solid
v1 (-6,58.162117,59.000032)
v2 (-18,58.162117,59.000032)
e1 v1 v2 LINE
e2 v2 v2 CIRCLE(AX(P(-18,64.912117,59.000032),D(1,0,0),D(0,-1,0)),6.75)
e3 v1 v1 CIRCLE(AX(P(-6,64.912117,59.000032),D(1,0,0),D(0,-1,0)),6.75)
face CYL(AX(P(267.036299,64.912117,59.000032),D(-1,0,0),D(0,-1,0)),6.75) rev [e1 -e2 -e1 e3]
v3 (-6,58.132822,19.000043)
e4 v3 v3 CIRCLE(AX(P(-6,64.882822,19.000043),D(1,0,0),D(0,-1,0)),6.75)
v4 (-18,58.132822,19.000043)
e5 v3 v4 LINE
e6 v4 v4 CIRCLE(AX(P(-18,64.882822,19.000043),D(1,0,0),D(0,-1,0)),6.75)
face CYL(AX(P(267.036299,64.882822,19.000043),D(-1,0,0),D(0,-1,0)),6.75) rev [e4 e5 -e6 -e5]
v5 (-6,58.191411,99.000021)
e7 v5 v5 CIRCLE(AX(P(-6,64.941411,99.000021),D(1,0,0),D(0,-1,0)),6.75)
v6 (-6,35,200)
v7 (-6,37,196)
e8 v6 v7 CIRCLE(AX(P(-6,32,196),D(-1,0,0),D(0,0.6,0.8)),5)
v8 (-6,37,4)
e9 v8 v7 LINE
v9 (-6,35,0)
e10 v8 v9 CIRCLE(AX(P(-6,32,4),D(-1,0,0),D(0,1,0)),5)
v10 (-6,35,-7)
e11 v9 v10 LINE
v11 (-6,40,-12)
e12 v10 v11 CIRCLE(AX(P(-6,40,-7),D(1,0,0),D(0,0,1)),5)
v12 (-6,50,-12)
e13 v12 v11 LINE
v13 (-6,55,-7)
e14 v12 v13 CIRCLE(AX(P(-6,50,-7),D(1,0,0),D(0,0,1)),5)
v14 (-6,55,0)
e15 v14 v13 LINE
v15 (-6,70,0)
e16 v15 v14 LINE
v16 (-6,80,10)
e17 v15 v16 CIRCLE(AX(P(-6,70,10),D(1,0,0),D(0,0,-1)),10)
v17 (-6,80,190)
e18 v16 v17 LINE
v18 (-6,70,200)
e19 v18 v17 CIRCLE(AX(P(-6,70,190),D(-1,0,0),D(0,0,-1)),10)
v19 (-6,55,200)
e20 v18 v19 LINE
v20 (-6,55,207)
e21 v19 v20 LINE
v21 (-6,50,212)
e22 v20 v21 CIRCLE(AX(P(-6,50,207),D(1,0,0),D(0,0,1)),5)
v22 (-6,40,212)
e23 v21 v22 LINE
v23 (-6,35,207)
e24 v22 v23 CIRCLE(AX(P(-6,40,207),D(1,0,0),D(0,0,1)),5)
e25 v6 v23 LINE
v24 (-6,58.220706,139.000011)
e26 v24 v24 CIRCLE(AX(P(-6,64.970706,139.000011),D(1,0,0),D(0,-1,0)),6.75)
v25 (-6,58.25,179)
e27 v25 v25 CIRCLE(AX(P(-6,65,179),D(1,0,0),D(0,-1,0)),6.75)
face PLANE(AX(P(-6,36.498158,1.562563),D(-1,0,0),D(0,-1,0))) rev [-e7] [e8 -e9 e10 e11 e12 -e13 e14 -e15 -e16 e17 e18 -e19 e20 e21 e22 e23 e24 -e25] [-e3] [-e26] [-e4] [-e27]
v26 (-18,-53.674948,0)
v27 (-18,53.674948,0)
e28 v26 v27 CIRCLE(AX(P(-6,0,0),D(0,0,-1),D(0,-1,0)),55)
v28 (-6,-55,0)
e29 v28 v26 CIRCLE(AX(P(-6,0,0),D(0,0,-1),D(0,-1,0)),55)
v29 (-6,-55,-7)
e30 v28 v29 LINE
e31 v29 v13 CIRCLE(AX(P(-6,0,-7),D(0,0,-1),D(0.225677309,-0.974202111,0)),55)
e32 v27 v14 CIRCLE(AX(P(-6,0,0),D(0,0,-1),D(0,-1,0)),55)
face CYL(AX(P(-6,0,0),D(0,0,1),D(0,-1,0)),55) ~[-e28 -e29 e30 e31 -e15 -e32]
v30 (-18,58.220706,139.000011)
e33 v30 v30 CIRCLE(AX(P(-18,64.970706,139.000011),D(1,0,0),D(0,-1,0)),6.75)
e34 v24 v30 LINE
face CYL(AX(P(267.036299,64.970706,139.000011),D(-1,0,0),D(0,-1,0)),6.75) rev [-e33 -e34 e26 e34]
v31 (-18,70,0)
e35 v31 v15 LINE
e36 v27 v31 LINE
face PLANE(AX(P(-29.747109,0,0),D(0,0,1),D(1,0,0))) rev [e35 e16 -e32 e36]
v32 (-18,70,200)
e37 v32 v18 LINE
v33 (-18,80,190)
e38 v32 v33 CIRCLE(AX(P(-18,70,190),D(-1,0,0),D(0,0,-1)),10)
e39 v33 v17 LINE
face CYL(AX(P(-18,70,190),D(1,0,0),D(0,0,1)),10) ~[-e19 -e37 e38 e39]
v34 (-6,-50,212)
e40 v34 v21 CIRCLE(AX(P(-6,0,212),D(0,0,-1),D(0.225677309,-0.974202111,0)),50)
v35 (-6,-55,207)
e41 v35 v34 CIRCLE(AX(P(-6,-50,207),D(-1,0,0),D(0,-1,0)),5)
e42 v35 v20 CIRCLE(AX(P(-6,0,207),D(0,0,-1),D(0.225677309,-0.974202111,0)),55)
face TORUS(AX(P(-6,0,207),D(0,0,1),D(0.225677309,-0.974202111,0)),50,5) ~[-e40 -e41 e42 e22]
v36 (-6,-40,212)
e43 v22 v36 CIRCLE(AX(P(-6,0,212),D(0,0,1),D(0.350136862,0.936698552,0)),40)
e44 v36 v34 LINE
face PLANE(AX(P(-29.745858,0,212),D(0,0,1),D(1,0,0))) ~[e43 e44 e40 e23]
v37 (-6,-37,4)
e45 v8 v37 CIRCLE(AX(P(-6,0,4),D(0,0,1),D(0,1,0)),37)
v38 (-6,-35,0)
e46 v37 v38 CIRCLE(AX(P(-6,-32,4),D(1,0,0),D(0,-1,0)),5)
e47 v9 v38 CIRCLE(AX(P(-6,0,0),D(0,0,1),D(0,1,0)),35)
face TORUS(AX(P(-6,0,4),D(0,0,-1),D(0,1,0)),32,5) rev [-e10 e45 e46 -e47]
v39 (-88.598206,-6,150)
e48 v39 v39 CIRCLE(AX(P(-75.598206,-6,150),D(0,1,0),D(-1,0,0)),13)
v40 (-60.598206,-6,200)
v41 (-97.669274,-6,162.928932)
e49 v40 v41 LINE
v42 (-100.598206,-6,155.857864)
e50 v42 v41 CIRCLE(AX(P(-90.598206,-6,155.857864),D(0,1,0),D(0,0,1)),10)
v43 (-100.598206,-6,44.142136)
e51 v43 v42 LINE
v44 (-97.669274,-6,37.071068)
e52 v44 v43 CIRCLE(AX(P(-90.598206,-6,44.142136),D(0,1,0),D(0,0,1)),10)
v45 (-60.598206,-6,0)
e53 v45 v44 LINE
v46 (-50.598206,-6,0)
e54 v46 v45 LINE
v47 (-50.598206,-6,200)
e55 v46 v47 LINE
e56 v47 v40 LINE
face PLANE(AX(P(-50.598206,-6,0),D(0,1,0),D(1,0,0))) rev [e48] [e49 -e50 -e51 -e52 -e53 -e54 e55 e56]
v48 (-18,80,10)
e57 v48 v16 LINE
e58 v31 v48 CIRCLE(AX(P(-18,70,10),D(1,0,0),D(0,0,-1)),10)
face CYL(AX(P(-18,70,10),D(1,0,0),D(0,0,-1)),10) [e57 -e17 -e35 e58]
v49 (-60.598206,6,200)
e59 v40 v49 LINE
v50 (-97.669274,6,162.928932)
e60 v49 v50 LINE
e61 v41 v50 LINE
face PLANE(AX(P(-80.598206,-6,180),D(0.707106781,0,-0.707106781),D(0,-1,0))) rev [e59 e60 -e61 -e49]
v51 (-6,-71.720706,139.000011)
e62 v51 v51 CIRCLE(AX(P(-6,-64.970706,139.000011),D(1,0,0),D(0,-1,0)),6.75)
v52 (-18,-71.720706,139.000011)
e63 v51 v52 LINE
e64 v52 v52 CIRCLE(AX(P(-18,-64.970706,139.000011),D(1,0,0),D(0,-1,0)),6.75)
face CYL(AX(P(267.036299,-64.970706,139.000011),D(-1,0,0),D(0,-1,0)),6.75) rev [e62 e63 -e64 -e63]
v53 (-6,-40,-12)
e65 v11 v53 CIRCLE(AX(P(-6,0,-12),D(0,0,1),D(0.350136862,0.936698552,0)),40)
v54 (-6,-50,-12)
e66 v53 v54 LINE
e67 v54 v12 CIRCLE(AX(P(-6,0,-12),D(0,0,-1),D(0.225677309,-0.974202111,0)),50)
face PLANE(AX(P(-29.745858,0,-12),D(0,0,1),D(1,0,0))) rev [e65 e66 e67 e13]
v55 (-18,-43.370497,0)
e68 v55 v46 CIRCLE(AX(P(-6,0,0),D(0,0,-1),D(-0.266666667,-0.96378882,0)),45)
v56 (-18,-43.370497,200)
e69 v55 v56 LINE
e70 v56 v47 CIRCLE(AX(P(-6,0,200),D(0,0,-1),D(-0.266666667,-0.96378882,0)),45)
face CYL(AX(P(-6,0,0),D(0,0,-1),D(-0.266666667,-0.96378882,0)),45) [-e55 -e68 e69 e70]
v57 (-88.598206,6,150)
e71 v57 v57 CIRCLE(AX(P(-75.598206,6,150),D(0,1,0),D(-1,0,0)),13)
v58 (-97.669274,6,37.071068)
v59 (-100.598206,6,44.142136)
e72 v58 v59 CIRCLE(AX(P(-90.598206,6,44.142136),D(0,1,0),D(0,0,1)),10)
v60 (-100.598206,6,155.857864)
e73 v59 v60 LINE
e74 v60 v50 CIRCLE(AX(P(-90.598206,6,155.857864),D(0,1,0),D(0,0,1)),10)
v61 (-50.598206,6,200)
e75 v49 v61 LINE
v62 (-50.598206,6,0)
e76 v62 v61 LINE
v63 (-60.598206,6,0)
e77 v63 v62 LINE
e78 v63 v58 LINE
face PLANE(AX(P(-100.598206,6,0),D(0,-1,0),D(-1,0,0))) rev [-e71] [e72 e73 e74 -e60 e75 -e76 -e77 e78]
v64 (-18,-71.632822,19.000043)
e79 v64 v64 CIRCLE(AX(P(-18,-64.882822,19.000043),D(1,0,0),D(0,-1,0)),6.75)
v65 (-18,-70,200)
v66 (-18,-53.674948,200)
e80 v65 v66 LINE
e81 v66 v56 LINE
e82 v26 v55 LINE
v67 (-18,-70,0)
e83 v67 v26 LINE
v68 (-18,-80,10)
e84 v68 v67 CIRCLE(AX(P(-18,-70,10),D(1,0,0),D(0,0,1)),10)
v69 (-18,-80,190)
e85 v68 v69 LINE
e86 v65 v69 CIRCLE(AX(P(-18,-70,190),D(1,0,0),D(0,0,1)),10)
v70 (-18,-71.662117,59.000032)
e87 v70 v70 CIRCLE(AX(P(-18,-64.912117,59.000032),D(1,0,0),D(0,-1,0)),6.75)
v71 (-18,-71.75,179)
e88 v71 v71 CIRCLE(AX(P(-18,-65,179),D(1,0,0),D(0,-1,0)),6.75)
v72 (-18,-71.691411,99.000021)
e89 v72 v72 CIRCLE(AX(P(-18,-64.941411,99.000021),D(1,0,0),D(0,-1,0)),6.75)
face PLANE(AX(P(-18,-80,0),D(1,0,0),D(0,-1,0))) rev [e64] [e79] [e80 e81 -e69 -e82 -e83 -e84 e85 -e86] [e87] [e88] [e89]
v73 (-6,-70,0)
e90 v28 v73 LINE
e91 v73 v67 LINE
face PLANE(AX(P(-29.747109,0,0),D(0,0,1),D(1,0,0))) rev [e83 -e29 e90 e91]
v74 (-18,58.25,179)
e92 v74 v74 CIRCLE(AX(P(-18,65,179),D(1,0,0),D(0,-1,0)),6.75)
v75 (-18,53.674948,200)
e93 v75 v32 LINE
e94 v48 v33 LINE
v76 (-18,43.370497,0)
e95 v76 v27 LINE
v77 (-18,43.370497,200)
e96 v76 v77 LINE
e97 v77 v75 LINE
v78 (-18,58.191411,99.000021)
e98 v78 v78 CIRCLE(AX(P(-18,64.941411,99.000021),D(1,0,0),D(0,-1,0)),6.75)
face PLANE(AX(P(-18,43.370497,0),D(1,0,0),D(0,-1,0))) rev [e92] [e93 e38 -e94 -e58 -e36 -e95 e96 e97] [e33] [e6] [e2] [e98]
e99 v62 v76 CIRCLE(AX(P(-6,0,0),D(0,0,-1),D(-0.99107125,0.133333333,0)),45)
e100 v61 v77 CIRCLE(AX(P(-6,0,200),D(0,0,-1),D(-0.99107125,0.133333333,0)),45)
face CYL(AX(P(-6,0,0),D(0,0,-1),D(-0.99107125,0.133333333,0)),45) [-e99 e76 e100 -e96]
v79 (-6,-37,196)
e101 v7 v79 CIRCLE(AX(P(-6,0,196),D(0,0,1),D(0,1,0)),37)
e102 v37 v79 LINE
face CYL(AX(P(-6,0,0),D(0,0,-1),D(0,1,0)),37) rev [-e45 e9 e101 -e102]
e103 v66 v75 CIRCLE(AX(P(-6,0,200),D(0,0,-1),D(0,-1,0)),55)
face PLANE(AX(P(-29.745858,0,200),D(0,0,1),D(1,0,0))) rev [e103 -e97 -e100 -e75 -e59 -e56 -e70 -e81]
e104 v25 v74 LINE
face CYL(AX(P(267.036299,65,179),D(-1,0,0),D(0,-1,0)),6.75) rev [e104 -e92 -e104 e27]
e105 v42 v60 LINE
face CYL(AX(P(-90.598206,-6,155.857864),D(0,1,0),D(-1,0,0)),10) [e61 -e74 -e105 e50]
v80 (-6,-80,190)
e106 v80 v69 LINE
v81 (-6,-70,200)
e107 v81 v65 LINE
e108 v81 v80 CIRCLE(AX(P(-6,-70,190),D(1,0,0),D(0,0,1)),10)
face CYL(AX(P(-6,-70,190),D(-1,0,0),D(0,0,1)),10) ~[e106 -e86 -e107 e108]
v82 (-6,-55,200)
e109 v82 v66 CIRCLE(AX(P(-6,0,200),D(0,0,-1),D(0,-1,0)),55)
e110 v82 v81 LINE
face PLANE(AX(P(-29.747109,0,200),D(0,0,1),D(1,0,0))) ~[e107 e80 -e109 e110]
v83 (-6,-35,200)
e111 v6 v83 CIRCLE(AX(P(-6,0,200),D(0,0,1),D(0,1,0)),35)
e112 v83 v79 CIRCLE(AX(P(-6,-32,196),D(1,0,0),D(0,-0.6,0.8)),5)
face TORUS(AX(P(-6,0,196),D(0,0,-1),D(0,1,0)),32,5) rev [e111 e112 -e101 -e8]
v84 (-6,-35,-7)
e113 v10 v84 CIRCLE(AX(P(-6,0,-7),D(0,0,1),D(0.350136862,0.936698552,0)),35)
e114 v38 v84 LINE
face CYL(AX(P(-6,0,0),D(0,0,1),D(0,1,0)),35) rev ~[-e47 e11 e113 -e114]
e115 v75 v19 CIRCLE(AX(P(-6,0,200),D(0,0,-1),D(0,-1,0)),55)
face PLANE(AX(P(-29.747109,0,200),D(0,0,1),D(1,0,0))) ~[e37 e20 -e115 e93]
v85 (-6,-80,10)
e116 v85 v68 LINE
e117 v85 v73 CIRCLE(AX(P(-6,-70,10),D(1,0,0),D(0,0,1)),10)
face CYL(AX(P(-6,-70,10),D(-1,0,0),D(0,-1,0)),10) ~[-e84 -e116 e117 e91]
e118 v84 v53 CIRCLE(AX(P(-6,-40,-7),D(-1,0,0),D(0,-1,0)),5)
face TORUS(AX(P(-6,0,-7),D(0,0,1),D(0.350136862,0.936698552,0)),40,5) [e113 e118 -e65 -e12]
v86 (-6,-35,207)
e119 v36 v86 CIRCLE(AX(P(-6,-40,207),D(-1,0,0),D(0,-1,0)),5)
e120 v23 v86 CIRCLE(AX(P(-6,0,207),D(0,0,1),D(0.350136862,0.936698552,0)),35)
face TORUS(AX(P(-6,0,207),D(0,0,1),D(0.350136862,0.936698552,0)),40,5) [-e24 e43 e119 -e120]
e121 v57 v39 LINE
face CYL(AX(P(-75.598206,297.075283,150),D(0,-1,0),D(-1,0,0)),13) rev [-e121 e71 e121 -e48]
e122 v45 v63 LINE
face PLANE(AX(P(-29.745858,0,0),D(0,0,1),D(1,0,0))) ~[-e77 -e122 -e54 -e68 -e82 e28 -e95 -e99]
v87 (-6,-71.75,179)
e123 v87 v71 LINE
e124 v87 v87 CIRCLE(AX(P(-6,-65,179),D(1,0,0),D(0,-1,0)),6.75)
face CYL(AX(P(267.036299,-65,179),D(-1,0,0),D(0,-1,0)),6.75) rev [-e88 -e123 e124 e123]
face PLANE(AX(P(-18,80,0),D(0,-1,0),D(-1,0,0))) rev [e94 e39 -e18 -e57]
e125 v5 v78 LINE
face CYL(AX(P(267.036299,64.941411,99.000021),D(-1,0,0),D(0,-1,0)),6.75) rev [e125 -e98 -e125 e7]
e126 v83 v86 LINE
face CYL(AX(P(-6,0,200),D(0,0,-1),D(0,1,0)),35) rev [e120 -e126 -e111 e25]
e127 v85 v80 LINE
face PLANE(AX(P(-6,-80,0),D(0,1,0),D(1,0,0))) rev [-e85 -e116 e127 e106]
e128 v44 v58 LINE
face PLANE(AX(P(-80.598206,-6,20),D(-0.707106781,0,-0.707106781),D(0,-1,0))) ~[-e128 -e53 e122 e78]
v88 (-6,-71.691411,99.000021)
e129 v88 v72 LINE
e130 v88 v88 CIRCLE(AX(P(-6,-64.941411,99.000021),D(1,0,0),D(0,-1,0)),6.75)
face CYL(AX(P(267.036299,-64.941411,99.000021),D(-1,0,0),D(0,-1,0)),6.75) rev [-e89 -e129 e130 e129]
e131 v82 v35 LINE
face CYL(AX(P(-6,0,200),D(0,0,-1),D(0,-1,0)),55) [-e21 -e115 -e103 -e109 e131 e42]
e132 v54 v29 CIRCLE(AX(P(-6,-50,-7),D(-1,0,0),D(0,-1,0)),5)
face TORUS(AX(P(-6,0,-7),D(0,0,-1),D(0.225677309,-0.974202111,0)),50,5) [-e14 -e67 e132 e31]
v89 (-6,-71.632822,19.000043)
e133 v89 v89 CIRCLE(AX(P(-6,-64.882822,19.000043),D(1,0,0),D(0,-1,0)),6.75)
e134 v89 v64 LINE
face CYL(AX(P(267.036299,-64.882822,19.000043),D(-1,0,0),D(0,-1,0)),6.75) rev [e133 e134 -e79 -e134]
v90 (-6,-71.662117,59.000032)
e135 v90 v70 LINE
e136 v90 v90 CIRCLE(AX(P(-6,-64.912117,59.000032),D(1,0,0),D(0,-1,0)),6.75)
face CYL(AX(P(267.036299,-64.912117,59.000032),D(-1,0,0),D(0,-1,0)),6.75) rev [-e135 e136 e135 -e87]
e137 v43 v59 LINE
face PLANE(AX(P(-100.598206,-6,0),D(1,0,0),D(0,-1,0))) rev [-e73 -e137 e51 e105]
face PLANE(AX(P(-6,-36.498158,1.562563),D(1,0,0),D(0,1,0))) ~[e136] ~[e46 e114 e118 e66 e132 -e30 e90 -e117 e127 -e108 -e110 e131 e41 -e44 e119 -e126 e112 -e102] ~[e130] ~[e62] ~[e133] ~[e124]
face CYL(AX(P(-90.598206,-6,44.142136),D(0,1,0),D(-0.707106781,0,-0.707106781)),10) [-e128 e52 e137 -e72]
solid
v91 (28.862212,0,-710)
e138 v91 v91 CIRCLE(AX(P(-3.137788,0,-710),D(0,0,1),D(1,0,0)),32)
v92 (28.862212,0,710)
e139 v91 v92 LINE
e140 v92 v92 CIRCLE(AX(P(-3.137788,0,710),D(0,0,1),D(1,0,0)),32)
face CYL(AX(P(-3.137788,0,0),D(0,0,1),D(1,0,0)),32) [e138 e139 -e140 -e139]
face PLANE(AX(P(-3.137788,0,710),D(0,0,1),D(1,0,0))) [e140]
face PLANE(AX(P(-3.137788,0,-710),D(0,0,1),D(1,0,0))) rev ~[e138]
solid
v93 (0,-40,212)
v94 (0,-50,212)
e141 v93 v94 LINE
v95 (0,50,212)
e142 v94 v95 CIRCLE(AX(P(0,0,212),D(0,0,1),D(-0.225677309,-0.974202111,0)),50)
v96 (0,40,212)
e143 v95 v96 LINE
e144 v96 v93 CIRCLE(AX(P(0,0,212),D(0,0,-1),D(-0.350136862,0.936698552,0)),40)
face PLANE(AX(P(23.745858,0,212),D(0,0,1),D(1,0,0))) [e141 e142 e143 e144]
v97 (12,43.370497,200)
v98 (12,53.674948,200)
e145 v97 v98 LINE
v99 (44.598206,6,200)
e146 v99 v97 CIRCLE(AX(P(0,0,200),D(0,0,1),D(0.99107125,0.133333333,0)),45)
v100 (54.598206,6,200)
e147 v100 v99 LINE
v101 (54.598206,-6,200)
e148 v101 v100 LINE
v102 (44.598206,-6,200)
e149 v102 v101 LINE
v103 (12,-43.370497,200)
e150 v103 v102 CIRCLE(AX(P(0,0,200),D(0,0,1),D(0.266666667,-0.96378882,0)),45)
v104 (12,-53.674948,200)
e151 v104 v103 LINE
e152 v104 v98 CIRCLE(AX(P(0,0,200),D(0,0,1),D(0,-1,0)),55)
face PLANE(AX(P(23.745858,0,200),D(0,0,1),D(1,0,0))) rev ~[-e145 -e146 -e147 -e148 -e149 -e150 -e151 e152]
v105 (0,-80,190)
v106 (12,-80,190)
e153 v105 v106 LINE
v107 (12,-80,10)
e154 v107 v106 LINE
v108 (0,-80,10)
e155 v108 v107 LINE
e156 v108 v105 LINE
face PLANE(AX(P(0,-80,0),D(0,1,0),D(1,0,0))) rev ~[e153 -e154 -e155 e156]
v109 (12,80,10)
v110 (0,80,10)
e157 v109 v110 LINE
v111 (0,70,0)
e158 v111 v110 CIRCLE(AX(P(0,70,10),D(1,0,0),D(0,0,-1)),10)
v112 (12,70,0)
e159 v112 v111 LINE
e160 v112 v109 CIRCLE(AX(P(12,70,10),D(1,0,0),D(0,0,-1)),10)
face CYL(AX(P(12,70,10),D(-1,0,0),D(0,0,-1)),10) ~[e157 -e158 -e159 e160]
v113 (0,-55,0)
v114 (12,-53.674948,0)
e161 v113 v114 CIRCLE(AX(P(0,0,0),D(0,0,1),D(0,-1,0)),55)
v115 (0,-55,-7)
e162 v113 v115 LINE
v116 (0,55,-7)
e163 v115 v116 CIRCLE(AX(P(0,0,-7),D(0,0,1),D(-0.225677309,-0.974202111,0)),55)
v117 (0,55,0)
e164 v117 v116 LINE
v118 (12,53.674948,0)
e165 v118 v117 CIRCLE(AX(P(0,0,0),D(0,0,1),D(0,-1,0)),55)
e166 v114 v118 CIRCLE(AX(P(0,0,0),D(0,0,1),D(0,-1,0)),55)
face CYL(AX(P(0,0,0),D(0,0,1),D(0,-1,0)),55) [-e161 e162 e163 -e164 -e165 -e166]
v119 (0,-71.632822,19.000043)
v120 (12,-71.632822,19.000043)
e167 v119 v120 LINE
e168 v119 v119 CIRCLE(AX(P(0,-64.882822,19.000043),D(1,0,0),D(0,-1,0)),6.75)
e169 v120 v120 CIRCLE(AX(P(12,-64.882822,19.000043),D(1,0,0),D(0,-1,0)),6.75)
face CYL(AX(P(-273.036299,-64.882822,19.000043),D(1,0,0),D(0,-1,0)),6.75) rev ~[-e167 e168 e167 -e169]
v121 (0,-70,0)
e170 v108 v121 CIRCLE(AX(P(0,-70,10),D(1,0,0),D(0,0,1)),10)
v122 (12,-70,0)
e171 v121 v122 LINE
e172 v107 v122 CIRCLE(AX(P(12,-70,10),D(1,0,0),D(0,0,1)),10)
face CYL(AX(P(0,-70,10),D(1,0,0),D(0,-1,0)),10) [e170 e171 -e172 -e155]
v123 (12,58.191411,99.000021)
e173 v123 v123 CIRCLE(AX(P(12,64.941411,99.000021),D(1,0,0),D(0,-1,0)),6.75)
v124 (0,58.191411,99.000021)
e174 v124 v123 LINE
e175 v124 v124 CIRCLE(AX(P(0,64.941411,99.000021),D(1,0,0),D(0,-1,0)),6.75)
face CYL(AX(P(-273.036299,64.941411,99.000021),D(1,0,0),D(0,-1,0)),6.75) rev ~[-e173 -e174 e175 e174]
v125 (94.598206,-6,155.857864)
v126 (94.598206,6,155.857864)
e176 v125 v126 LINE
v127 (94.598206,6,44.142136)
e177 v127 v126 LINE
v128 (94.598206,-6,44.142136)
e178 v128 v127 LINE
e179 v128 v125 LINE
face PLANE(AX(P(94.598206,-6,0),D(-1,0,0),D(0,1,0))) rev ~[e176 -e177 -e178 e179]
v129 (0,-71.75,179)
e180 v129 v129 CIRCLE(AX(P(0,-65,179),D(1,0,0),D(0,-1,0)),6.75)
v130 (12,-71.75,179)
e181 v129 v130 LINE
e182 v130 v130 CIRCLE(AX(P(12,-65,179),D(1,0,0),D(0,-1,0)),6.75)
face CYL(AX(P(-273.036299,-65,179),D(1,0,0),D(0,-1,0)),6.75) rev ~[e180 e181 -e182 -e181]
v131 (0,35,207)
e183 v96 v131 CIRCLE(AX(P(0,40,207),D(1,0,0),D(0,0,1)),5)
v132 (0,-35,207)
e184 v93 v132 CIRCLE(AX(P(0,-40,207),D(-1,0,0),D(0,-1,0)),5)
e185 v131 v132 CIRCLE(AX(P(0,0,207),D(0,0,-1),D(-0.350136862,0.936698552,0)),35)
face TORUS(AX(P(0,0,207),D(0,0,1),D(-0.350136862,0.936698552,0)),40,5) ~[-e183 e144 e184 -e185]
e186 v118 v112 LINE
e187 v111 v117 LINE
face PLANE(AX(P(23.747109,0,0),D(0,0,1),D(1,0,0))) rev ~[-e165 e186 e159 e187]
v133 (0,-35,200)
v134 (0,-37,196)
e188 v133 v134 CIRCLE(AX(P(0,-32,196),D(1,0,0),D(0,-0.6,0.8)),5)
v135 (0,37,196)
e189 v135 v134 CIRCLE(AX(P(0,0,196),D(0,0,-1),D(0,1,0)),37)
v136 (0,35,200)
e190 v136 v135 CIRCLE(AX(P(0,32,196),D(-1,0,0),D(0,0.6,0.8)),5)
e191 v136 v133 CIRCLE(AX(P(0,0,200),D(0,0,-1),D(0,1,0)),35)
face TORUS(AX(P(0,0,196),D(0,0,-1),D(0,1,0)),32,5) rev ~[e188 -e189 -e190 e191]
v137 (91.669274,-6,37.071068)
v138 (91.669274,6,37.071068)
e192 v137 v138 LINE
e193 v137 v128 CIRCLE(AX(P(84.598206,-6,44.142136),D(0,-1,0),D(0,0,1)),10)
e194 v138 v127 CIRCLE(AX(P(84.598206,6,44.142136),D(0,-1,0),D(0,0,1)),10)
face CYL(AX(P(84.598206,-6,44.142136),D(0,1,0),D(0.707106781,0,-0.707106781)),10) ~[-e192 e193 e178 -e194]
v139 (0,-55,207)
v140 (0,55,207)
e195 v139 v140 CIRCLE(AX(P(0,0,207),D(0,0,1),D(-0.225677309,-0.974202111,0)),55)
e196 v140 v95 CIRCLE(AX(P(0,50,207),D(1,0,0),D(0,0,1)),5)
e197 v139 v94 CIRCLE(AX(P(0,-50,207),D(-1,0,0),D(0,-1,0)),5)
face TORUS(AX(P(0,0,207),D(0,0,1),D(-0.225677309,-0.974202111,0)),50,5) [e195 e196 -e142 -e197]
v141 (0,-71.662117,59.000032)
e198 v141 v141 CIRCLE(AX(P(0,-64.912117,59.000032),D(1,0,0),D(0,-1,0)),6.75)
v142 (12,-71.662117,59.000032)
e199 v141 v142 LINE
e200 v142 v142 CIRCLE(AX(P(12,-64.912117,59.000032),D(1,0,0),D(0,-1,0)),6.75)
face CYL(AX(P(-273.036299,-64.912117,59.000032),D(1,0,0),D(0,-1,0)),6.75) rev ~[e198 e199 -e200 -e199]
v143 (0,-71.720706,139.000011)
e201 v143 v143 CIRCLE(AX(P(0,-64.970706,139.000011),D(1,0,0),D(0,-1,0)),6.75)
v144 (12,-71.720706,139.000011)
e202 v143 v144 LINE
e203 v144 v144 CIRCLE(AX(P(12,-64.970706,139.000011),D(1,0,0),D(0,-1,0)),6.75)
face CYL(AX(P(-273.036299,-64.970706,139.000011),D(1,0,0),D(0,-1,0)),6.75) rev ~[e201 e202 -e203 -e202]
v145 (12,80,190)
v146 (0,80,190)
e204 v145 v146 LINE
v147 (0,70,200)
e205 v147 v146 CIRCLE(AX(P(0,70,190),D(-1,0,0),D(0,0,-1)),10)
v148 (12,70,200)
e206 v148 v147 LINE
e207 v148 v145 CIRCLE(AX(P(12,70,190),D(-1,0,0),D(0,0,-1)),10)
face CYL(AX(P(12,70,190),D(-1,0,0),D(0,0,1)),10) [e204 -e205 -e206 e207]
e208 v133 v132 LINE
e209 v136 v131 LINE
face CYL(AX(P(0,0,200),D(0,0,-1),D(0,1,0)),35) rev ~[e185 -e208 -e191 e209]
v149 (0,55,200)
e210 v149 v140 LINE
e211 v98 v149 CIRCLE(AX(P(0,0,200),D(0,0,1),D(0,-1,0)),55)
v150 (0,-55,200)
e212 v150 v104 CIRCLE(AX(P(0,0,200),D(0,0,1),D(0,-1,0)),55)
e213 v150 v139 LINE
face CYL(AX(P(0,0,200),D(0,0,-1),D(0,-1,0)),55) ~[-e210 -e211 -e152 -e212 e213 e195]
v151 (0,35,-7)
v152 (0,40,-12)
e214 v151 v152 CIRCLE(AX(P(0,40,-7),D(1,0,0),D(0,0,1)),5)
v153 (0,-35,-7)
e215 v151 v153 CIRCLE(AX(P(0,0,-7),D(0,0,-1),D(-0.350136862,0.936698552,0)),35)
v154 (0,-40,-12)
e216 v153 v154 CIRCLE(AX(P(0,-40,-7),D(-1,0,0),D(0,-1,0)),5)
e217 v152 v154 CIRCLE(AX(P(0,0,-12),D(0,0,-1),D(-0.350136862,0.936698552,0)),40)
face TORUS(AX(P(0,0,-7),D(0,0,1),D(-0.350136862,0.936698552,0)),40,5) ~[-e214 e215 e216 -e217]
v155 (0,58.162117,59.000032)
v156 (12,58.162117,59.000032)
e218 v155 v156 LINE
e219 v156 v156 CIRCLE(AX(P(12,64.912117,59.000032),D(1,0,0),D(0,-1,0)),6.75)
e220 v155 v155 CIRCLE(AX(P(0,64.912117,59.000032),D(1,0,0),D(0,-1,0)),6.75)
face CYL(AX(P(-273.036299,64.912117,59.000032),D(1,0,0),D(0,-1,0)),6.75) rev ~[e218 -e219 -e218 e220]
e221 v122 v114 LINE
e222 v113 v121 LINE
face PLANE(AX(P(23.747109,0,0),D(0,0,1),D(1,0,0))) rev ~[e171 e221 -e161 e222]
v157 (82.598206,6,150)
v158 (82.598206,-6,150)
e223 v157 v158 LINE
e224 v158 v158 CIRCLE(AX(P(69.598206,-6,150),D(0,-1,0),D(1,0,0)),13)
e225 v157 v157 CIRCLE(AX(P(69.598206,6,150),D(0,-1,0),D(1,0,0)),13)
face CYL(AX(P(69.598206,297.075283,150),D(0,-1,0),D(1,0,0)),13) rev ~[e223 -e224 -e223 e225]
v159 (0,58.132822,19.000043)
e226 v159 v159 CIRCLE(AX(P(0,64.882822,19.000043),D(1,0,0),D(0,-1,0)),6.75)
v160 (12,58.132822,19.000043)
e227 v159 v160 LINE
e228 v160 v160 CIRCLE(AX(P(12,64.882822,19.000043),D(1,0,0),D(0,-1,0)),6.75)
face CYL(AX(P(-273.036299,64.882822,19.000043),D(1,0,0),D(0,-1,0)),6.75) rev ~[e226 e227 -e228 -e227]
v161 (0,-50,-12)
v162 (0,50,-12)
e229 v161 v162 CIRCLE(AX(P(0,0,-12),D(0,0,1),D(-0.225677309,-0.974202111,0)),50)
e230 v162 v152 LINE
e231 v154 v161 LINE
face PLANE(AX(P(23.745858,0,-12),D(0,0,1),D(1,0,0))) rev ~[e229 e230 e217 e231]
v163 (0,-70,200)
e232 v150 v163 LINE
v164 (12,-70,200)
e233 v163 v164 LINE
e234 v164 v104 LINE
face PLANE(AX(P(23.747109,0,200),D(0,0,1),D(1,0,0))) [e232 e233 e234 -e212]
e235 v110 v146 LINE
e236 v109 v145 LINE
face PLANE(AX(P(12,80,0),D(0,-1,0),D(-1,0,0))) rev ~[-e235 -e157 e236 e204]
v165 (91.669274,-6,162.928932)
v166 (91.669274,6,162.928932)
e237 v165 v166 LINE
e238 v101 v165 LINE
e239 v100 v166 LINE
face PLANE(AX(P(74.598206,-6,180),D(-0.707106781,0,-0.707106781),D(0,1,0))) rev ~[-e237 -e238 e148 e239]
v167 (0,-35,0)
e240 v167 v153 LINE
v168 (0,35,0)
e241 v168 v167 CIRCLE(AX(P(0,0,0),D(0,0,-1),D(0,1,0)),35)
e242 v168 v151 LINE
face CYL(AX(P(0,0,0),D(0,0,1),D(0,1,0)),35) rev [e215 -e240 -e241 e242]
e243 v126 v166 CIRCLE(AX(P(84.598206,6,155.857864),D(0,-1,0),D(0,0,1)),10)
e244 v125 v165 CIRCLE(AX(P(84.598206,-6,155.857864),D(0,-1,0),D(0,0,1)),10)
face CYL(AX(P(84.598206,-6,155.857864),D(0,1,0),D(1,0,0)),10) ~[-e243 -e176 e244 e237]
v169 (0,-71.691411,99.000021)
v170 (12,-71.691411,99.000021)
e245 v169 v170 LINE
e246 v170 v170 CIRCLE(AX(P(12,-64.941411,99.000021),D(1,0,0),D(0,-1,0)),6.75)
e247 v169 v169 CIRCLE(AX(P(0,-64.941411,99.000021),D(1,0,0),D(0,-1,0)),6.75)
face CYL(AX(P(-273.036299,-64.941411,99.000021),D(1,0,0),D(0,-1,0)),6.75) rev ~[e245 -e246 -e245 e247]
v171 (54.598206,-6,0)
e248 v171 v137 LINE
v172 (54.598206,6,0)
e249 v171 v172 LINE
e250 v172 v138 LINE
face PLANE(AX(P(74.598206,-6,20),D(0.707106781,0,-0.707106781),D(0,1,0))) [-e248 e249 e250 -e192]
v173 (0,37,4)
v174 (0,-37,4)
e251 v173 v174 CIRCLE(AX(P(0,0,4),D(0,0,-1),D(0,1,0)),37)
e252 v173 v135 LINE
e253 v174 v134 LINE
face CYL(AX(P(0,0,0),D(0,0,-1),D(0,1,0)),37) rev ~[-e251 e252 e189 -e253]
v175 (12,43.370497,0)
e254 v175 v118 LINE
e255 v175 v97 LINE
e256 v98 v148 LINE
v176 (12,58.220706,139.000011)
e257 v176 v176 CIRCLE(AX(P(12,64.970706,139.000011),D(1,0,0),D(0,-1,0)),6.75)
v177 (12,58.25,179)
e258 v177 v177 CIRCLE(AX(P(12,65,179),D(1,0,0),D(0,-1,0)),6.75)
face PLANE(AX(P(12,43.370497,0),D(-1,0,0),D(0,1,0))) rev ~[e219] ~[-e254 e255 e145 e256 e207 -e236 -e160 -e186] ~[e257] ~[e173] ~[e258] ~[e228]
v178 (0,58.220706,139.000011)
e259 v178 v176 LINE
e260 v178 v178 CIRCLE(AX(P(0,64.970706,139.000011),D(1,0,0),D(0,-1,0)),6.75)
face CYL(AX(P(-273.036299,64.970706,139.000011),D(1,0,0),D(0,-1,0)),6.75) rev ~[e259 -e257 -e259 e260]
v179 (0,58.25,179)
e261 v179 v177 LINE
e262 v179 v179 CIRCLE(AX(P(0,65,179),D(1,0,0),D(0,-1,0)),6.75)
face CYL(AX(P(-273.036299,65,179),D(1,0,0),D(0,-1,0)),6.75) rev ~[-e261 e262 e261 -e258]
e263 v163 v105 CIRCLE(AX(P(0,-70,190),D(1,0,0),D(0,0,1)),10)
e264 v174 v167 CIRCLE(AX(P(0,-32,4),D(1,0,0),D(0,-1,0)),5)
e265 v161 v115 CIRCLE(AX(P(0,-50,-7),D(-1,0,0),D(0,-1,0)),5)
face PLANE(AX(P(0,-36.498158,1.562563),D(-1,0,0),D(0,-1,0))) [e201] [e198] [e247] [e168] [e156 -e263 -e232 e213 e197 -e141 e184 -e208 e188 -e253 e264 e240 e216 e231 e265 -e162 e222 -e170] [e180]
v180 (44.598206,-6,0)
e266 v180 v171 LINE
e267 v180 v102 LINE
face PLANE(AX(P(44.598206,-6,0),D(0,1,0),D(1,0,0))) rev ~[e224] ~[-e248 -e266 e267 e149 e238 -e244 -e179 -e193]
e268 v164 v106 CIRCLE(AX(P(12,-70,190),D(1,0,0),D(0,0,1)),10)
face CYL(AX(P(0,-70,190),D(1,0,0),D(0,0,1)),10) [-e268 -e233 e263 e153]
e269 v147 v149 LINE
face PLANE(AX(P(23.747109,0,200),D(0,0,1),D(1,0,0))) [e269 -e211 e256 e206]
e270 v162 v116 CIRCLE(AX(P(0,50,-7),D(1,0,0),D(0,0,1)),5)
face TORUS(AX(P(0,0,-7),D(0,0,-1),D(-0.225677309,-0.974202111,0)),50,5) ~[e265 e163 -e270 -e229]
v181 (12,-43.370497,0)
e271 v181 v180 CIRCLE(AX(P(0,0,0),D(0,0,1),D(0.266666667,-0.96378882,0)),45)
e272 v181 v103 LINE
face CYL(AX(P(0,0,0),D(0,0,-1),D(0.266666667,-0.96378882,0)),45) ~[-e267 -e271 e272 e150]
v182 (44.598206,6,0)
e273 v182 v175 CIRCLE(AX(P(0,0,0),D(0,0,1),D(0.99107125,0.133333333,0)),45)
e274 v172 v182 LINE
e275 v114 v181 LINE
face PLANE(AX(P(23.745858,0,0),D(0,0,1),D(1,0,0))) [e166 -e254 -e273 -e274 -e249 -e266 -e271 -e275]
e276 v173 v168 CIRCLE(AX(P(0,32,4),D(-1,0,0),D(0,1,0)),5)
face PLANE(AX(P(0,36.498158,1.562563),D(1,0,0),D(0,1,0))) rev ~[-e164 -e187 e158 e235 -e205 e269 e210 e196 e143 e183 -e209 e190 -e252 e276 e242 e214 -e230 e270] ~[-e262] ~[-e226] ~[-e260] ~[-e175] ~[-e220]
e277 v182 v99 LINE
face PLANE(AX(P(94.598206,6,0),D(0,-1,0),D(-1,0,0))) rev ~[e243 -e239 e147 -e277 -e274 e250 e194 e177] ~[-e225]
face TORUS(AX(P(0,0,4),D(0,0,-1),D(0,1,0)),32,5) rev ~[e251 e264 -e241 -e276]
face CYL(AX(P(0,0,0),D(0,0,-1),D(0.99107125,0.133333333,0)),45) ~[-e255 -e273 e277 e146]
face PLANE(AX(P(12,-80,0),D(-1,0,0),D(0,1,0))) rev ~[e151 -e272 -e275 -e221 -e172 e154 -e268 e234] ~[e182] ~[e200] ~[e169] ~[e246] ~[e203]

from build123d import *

# Parameters (mm, degrees)
F1_DEPTH      = 200
F3_D          = 13.5
F4_SIZE       = 40
F6_R          = 10
F8_DEPTH      = 12
F11_DEPTH     = 12
F12_D         = 26
F13_R         = 10
F14_T2_ANGLE  = 180
F14_T4_ANGLE  = 180
F14_T6_ANGLE  = 206.0854190728
F14_T8_ANGLE  = 206.0854190728
F14_T10_ANGLE = 220.9913728288
F14_T12_ANGLE = 220.9913728288
F17_R         = 32
F18_DEPTH     = 710


# Not quite as in the source:
# - a fillet or chamfer that OpenCascade refuses, or shapes differently, is made with other operations: its cross-section is extruded or revolved along the edge and cut away or added


with BuildPart() as f1:
    # F0 (on Top) → F1 (new body)
    with BuildSketch(Plane.XY):
        with BuildLine():
            ThreePointArc((0, 37), (37, 0), (0, -37))
            Line((0, -37), (0, -45))
            ThreePointArc((0, -45), (6.0550656562, -44.5907633922), (12, -43.3704968844))
            ThreePointArc((12, -43.3704968844), (33.9113218085, -29.5807750609), (44.598206242, -6))
            ThreePointArc((44.598206242, -6), (45, 0), (44.598206242, 6))
            ThreePointArc((44.598206242, 6), (33.9113218085, 29.5807750609), (12, 43.3704968844))
            ThreePointArc((12, 43.3704968844), (6.0550656562, 44.5907633922), (0, 45))
            Line((0, 45), (0, 37))
        make_face()
        with BuildLine():
            Line((0, 80), (0, 45))
            ThreePointArc((0, 45), (6.0550656562, 44.5907633922), (12, 43.3704968844))
            Line((12, 43.3704968844), (12, 80))
            Line((12, 80), (0, 80))
        make_face()
        with BuildLine():
            ThreePointArc((44.598206242, 6), (45, 0), (44.598206242, -6))
            Line((44.598206242, -6), (94.598206242, -6))
            Line((94.598206242, -6), (94.598206242, 6))
            Line((94.598206242, 6), (44.598206242, 6))
        make_face()
        with BuildLine():
            ThreePointArc((12, -43.3704968844), (6.0550656562, -44.5907633922), (0, -45))
            Line((0, -45), (0, -80))
            Line((0, -80), (12, -80))
            Line((12, -80), (12, -43.3704968844))
        make_face()
    extrude(amount=F1_DEPTH)

    # F3 (through all)
    with Locations(Plane(origin=(0, 0, 0), x_dir=(0, 1, 0), z_dir=(-1, 0, 0))):
        with Locations((-65, -179), (-64.9707055397, -139.0000107271), (-64.9414110793, -99.0000214541), (-64.912116619, -59.0000321812), (-64.8828221586, -19.0000429083), (65, -179), (64.9707055397, -139.0000107271), (64.9414110793, -99.0000214541), (64.912116619, -59.0000321812), (64.8828221586, -19.0000429083)):
            Hole(F3_D / 2)

    # F4
    f4_edges = [f1.edges().sort_by_distance(p)[0] for p in [
        (94.598206, 0, 200),
        (94.598206, 0, 0),
    ]]
    chamfer(f4_edges, length=F4_SIZE)

    # F6
    f6_edges = [f1.edges().sort_by_distance(p)[0] for p in [
        (94.598206, 0, 160),
        (94.598206, 0, 40),
    ]]
    fillet(f6_edges, radius=F6_R)

    # F7 (on Top) → F8 (join)
    with BuildSketch(Plane.XY):
        with BuildLine():
            Line((0, -35), (0, -55))
            ThreePointArc((0, -55), (55, 0), (0, 55))
            Line((0, 55), (0, 35))
            ThreePointArc((0, 35), (35, 0), (0, -35))
        make_face()
    extrude(amount=-F8_DEPTH)

    # F10 (on offset) → F11 (join)
    with BuildSketch(Plane.XY.offset(200)):
        with BuildLine():
            Line((0, -35), (0, -55))
            ThreePointArc((0, -55), (55, 0), (0, 55))
            Line((0, 55), (0, 35))
            ThreePointArc((0, 35), (35, 0), (0, -35))
        make_face()
    extrude(amount=F11_DEPTH)

    # F12 (through all)
    with Locations(Plane(origin=(0, 6, 0), x_dir=(-1, 0, 0), z_dir=(0, 1, 0))):
        with Locations((-69.598206242, 150)):
            Hole(F12_D / 2)

    # F13
    f13_edges = [f1.edges().sort_by_distance(p)[0] for p in [
        (6, -80, 200),
        (6, 80, 200),
        (6, 80, 0),
        (6, -80, 0),
    ]]
    fillet(f13_edges, radius=F13_R)

    # F14: fillet of radius 5 on 6 edges, made by hand

    # F14_s1 → F14_t2 (revolve)
    with BuildSketch(Plane.YZ):
        with BuildLine():
            ThreePointArc((35, 200), (36.472135955, 198.2360679775), (37, 196))
            Line((37, 196), (37, 200))
            Line((37, 200), (35, 200))
        make_face()
    revolve(axis=Axis((0, 0, 200), (0, 0, -1)), revolution_arc=F14_T2_ANGLE)

    # F14_s3 → F14_t4 (revolve)
    with BuildSketch(Plane.YZ):
        with BuildLine():
            ThreePointArc((37, 4), (36.472135955, 1.7639320225), (35, 0))
            Line((35, 0), (37, 0))
            Line((37, 0), (37, 4))
        make_face()
    revolve(axis=Axis((0, 0, 0), (0, 0, -1)), revolution_arc=F14_T4_ANGLE)

    # F14_s5 → F14_t6 (revolve, cut)
    with BuildSketch(Plane(origin=(0, 0, 0), x_dir=(0, 0, 1), z_dir=(-0.9742021106, 0.2256773087, 0))):
        with BuildLine():
            ThreePointArc((-7, -55), (-10.5355339059, -53.5355339059), (-12, -50))
            Line((-12, -50), (-12, -55))
            Line((-12, -55), (-7, -55))
        make_face()
    revolve(axis=Axis((0, 0, -12), (0, 0, 1)), revolution_arc=F14_T6_ANGLE, mode=Mode.SUBTRACT)

    # F14_s7 → F14_t8 (revolve, cut)
    with BuildSketch(Plane(origin=(0, 0, 0), x_dir=(0, 0, 1), z_dir=(-0.9742021106, 0.2256773087, 0))):
        with BuildLine():
            ThreePointArc((207, -55), (210.5355339059, -53.5355339059), (212, -50))
            Line((212, -50), (212, -55))
            Line((212, -55), (207, -55))
        make_face()
    revolve(axis=Axis((0, 0, 212), (0, 0, 1)), revolution_arc=F14_T8_ANGLE, mode=Mode.SUBTRACT)

    # F14_s9 → F14_t10 (revolve, cut)
    with BuildSketch(Plane(origin=(0, 0, 0), x_dir=(0, 0, 1), z_dir=(-0.9366985524, -0.3501368617, 0))):
        with BuildLine():
            ThreePointArc((212, 40), (210.5355339059, 36.4644660941), (207, 35))
            Line((207, 35), (212, 35))
            Line((212, 35), (212, 40))
        make_face()
    revolve(axis=Axis((0, 0, 212), (0, 0, -1)), revolution_arc=F14_T10_ANGLE, mode=Mode.SUBTRACT)

    # F14_s11 → F14_t12 (revolve, cut)
    with BuildSketch(Plane(origin=(0, 0, 0), x_dir=(0, 0, 1), z_dir=(-0.9366985524, -0.3501368617, 0))):
        with BuildLine():
            ThreePointArc((-7, 35), (-10.5355339059, 36.4644660941), (-12, 40))
            Line((-12, 40), (-12, 35))
            Line((-12, 35), (-7, 35))
        make_face()
    revolve(axis=Axis((0, 0, -12), (0, 0, -1)), revolution_arc=F14_T12_ANGLE, mode=Mode.SUBTRACT)


with BuildPart() as f16_1:
    # F16: instance of F1
    add(f1.part.mirror(Plane.YZ.offset(-3)))


with BuildPart() as f18:
    # F17 (on Top) → F18 (new body, symmetric)
    with BuildSketch(Plane.XY):
        with Locations((-3.1377882697, 0)):
            Circle(F17_R)
    extrude(amount=F18_DEPTH, both=True)


solid = Compound([f1.part, f16_1.part, f18.part])
